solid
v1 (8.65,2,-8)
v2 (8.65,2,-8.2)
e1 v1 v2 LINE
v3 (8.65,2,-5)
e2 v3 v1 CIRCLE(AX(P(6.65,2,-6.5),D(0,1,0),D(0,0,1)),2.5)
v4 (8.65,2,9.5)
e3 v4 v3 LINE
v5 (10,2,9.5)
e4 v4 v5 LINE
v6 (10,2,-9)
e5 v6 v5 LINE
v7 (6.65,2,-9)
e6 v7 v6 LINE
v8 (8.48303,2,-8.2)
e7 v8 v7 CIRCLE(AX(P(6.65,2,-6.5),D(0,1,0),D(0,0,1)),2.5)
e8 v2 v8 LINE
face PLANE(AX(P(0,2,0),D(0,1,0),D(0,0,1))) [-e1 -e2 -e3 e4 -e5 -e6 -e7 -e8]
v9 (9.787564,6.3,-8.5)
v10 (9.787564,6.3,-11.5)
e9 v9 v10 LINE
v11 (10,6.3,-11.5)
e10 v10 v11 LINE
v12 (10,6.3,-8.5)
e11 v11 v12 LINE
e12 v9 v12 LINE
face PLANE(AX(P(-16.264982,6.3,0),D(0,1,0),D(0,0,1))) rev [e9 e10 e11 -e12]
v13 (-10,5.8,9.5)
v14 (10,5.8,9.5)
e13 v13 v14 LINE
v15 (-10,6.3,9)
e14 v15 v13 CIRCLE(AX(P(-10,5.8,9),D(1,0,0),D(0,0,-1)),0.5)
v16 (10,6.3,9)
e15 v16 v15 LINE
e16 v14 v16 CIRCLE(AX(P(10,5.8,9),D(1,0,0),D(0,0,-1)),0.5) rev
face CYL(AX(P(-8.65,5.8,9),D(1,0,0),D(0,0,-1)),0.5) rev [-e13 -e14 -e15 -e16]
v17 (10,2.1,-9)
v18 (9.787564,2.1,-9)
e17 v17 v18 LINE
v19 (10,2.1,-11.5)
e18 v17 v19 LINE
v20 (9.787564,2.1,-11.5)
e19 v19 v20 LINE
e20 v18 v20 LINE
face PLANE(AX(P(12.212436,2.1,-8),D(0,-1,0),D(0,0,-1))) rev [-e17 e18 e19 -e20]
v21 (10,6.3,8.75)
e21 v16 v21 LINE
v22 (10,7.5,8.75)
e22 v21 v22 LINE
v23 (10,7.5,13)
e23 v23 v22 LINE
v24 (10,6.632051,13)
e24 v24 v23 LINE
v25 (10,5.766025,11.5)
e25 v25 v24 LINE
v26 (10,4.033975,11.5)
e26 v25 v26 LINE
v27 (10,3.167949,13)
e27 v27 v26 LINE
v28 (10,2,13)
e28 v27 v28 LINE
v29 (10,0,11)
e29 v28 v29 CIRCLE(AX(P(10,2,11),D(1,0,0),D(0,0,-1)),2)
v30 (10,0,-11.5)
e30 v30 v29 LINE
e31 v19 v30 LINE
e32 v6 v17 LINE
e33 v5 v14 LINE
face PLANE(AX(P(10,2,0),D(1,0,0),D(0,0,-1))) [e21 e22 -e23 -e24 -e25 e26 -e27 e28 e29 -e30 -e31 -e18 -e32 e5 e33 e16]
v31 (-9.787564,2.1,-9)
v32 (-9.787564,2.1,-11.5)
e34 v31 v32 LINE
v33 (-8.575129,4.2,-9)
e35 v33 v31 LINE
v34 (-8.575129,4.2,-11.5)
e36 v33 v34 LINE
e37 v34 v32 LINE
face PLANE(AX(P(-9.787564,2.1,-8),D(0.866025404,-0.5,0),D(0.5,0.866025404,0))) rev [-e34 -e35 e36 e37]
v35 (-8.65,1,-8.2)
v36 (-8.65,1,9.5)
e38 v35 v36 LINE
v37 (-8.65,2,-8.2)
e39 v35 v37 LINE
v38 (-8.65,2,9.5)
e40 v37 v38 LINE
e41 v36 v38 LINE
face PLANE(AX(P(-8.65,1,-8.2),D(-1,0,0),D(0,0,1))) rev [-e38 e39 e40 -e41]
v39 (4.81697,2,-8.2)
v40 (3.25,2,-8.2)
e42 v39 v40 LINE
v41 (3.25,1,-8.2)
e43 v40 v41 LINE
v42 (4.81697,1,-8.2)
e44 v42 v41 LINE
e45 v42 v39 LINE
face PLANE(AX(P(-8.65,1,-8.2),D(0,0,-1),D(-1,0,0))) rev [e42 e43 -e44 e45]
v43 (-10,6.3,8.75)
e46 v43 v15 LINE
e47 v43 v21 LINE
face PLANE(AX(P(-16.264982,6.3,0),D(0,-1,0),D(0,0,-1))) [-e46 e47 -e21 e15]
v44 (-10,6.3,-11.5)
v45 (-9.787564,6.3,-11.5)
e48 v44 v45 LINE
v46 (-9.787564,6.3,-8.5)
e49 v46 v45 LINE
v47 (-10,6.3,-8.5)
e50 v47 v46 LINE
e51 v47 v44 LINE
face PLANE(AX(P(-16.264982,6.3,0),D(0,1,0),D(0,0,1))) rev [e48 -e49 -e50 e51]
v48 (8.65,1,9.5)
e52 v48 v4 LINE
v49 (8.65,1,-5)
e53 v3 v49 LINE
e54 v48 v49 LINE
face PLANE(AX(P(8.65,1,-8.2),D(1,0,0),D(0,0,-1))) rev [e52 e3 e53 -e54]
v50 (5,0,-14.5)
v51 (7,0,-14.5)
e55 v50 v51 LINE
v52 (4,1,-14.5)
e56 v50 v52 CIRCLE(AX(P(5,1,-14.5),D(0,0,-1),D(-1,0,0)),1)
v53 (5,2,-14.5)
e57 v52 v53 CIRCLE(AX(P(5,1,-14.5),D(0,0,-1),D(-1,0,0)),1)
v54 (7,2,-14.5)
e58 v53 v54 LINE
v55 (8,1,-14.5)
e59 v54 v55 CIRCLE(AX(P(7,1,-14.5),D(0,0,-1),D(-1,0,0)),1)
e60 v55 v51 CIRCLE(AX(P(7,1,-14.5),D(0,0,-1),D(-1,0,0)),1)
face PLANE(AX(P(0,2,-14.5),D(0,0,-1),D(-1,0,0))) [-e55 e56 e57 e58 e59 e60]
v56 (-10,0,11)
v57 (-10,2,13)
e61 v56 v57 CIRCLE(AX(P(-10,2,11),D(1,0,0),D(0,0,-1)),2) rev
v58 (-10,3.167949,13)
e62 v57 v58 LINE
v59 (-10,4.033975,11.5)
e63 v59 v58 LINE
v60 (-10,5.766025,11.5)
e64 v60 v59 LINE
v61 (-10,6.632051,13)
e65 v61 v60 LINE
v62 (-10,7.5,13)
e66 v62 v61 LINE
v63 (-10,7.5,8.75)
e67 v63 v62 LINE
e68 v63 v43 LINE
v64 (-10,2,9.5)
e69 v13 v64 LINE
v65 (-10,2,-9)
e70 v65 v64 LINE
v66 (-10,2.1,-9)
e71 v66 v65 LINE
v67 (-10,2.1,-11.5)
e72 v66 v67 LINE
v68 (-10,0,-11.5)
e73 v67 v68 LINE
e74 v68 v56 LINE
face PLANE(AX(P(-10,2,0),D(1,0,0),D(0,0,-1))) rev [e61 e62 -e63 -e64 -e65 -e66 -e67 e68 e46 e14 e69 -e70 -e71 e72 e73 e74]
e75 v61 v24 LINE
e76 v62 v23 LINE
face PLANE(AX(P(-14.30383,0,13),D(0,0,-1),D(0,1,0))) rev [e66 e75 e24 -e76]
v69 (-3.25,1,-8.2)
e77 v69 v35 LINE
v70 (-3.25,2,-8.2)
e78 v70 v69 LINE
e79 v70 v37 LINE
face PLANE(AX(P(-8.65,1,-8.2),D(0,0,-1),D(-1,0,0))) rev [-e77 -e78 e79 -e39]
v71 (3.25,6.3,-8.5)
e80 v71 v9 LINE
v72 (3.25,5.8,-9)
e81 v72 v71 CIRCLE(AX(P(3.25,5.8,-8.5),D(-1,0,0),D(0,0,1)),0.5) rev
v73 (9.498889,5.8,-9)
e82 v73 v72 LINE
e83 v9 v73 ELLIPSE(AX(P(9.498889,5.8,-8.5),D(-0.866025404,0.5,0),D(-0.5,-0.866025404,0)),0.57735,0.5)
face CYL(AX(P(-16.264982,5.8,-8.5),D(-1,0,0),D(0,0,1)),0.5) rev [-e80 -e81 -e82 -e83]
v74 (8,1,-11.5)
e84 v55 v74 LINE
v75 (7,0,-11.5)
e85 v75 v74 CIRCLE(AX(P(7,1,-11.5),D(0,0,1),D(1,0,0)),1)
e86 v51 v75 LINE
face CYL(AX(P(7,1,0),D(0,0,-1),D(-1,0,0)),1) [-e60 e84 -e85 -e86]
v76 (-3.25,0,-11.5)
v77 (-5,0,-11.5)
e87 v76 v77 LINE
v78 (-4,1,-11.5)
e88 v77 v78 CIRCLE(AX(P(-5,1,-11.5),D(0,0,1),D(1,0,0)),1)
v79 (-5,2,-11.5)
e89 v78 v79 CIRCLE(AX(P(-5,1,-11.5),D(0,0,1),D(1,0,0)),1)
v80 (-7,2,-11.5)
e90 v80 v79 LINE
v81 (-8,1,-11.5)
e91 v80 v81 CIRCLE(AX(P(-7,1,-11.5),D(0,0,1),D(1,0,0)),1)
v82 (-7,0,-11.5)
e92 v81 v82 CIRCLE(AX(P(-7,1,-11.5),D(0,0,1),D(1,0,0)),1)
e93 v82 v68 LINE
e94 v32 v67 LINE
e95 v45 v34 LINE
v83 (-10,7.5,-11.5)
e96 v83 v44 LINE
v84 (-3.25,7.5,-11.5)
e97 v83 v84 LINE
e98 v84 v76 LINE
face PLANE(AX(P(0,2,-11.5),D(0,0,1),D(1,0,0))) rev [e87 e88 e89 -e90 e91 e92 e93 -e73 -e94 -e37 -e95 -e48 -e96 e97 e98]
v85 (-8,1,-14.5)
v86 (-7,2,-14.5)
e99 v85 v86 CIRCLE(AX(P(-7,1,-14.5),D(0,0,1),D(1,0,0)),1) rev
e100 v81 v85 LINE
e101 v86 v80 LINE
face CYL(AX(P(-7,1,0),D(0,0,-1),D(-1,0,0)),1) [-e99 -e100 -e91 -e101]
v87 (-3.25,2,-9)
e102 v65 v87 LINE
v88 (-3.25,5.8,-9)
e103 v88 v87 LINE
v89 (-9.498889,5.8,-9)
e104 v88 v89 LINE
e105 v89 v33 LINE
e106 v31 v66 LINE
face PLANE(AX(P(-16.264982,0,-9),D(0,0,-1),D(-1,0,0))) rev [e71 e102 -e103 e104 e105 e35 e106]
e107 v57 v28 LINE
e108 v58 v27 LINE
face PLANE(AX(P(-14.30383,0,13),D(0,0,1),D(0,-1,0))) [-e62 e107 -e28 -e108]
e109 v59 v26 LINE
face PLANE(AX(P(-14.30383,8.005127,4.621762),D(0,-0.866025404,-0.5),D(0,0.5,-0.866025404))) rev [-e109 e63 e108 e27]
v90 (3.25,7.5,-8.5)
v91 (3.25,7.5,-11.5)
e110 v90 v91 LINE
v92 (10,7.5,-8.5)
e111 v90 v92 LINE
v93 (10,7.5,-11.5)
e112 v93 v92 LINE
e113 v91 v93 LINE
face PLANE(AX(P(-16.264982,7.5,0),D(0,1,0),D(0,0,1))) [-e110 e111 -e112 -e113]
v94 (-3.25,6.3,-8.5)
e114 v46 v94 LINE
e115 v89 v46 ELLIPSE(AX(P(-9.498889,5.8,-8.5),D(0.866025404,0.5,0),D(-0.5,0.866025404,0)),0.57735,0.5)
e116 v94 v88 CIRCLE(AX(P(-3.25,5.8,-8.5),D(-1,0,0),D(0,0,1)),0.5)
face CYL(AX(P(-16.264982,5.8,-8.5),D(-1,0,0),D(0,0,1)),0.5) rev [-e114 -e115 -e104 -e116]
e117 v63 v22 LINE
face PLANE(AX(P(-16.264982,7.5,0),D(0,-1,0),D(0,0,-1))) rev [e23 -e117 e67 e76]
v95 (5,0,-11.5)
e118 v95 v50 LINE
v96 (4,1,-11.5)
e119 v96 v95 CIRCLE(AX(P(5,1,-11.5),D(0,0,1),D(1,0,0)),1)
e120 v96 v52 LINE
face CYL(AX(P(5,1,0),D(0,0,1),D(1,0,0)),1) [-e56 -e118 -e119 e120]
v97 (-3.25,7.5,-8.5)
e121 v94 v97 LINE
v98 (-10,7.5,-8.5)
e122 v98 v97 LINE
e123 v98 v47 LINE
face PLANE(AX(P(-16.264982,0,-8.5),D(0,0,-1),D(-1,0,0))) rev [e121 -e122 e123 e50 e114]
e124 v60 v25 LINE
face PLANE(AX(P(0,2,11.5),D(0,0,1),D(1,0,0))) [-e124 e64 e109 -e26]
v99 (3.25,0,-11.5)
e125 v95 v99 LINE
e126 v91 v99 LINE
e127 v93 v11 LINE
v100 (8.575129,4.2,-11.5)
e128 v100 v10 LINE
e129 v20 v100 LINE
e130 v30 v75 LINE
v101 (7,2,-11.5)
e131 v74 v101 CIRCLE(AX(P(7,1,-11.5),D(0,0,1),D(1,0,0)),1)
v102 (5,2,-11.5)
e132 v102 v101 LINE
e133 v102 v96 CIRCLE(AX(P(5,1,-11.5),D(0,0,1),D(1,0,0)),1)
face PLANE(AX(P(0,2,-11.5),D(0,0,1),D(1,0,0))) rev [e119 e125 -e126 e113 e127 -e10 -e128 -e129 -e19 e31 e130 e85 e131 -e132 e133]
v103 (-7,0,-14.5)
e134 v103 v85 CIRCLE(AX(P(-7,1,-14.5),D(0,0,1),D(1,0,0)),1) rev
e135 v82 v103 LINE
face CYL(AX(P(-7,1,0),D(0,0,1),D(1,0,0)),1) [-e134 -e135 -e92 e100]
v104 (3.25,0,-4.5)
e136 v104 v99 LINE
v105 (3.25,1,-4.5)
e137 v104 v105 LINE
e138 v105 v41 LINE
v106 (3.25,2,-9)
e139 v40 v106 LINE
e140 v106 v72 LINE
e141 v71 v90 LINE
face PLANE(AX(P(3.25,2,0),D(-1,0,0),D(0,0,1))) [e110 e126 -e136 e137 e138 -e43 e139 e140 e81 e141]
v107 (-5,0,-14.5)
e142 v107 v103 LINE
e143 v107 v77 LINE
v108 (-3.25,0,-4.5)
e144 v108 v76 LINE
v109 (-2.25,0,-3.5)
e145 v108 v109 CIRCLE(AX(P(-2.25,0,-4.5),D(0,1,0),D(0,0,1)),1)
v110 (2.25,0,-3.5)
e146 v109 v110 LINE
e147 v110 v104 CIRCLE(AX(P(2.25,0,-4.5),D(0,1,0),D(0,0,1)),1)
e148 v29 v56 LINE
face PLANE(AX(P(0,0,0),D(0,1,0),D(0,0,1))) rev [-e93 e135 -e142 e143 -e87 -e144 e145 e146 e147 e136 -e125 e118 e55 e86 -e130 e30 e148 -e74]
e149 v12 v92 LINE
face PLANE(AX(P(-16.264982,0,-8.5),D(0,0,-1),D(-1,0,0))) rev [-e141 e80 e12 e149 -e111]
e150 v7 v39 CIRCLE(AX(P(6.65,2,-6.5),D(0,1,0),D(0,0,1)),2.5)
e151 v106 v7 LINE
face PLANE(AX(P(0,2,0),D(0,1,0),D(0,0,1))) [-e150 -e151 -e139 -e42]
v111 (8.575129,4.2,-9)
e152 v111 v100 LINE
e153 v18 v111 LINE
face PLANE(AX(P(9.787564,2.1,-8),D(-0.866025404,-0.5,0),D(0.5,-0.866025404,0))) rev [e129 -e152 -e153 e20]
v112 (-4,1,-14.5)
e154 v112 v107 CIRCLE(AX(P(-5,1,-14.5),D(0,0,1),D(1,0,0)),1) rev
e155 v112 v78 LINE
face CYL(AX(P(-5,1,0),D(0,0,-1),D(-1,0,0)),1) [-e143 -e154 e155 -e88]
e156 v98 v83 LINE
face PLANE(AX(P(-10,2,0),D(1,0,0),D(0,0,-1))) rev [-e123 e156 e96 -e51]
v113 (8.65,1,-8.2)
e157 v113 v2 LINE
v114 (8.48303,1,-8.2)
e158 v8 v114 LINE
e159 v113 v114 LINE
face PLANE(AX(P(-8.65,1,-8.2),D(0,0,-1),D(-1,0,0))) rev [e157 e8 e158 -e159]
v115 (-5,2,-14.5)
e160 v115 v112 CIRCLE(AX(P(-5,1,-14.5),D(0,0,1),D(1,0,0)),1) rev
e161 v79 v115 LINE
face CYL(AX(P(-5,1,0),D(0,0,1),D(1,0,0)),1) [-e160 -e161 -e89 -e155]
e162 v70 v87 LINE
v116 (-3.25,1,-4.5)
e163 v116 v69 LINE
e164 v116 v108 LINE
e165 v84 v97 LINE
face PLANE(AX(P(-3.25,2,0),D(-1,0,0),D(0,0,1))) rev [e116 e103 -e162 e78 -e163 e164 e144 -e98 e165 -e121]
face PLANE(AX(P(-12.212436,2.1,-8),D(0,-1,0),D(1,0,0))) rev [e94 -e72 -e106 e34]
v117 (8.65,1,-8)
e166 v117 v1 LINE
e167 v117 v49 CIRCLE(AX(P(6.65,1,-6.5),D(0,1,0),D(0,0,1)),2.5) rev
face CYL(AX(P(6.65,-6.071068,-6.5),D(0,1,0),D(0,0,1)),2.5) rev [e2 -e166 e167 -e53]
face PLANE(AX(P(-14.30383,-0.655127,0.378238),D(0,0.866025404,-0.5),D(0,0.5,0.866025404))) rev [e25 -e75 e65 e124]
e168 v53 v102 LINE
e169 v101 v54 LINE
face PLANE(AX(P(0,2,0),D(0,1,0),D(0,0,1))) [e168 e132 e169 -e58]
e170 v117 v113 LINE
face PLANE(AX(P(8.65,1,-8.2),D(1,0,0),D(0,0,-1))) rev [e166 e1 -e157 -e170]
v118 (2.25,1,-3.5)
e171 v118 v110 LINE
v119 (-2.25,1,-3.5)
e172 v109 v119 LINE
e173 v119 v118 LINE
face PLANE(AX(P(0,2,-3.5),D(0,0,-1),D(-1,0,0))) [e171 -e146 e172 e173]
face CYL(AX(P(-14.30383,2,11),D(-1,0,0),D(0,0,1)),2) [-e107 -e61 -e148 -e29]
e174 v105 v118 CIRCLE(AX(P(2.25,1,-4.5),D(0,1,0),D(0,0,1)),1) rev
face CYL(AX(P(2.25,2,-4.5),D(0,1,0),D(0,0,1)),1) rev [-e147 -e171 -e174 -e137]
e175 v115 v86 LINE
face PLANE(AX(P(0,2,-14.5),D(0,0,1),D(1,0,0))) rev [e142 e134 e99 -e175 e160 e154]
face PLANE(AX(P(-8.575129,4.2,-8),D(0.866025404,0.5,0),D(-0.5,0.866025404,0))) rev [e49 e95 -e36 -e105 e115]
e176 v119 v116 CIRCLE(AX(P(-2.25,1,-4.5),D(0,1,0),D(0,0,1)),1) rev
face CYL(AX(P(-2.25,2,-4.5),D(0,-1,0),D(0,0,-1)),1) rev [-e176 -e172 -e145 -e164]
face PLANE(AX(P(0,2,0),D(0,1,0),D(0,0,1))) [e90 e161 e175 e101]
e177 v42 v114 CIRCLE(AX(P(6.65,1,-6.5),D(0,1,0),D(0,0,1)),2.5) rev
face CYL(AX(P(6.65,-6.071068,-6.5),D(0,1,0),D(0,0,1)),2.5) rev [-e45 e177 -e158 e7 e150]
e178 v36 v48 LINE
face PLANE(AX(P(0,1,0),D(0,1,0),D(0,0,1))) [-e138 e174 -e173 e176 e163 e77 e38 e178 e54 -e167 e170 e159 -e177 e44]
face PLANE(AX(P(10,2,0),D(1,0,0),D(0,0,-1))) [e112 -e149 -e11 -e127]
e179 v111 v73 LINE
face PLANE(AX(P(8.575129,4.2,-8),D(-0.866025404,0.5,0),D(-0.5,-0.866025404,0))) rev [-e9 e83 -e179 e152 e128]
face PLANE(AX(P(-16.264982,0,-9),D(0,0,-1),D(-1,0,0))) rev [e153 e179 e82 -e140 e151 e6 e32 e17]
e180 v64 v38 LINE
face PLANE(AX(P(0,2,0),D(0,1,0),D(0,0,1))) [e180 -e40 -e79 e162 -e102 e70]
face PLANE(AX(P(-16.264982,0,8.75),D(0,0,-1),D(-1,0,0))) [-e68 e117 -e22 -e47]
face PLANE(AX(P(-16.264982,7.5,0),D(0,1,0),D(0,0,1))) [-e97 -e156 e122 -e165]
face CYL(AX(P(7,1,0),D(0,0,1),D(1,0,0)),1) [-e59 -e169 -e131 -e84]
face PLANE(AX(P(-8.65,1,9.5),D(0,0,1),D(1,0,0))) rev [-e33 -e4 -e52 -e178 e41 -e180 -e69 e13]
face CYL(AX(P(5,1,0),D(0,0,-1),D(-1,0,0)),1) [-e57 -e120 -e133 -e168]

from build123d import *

# Parameters (mm, degrees)
BOSS_EXTRUDE1_DEPTH = 2
FILLET1_R           = 1
SKETCH4_W           = 17.3
SKETCH4_H           = 17.7
CUT_EXTRUDE3_DEPTH  = 1
BOSS_EXTRUDE3_REACH = 26.784
CUT_EXTRUDE5_REACH  = 21.144
SKETCH7_W           = 6.5
SKETCH7_H           = 3
CUT_EXTRUDE6_DEPTH  = 3.5
FILLET3_R           = 0.5
BOSS_EXTRUDE4_DEPTH = 20
SKETCH10_R          = 2.5
CUT_EXTRUDE7_DEPTH  = 1
FILLET4_R           = 2


# Some blends are built 0.0001 mm under size
with BuildPart() as part:
    # Sketch1 → Boss-Extrude1 (new body)
    with BuildSketch(Plane(origin=(0, 0, 0), x_dir=(1, 0, 0), z_dir=(0, 1, 0))):
        Polygon((10, -11.5), (10, 11.5), (8, 11.5), (8, 14.5), (4, 14.5), (4, 11.5), (3.25, 11.5), (3.25, 3.5), (-3.25, 3.5), (-3.25, 11.5), (-4, 11.5), (-4, 14.5), (-8, 14.5), (-8, 11.5), (-10, 11.5), (-10, -11.5), align=None)
    extrude(amount=BOSS_EXTRUDE1_DEPTH)

    # Fillet1
    fillet1_edges = [part.edges().sort_by_distance(p)[0] for p in [
        (-3.25, 1, -3.5),
        (3.25, 1, -3.5),
        (-8, 0, -13),
        (-8, 2, -13),
        (4, 0, -13),
        (4, 2, -13),
        (8, 0, -13),
        (8, 2, -13),
        (-4, 0, -13),
        (-4, 2, -13),
    ]]
    fillet(fillet1_edges, radius=FILLET1_R - 0.0001)  # a hair under: the kernel refuses the full size

    # Sketch4 → Cut-Extrude3 (cut)
    with BuildSketch(Plane(origin=(0, 2, 0), x_dir=(1, 0, 0), z_dir=(0, 1, 0))):
        with Locations((0, -0.65)):
            Rectangle(SKETCH4_W, SKETCH4_H)
    extrude(amount=-CUT_EXTRUDE3_DEPTH, mode=Mode.SUBTRACT)

    # Boss-Extrude3: up to this face of the body (flat: up to its plane)
    boss_extrude3_end = Plane(part.part.faces().sort_by_distance((-10, 1, 0))[0])
    # Sketch5 → Boss-Extrude3 (add, up to the picked face)
    with BuildSketch(Plane(origin=(10, 0, 0), x_dir=(0, 0, -1), z_dir=(1, 0, 0)), mode=Mode.PRIVATE) as boss_extrude3_sk1:
        Polygon((-11.5, 2), (-9.5, 2), (-9.5, 6.3), (-8.75, 6.3), (-8.75, 7.5), (-11.5, 7.5), align=None)
    boss_extrude3_tool1 = split(extrude(boss_extrude3_sk1.sketch, amount=-BOSS_EXTRUDE3_REACH, mode=Mode.PRIVATE), bisect_by=boss_extrude3_end, keep=Keep.BOTH, mode=Mode.PRIVATE)
    # Sketch5 → Boss-Extrude3 (add, up to the picked face)
    with BuildSketch(Plane(origin=(10, 0, 0), x_dir=(0, 0, -1), z_dir=(1, 0, 0)), mode=Mode.PRIVATE) as boss_extrude3_sk2:
        Polygon((9, 2), (11.5, 2), (11.5, 7.5), (8.5, 7.5), (8.5, 6.3), (9, 6.3), align=None)
    boss_extrude3_tool2 = split(extrude(boss_extrude3_sk2.sketch, amount=-BOSS_EXTRUDE3_REACH, mode=Mode.PRIVATE), bisect_by=boss_extrude3_end, keep=Keep.BOTH, mode=Mode.PRIVATE)
    add(boss_extrude3_tool1.solids().sort_by(Axis((10, 4.912605, 10.396008), (-1, 0, 0)))[0])
    add(boss_extrude3_tool2.solids().sort_by(Axis((10, 4.839895, -10.187282), (-1, 0, 0)))[0])

    # Sketch7 → Cut-Extrude5 (cut, up to next)
    with BuildSketch(Plane(origin=(0, 7.5, 0), x_dir=(1, 0, 0), z_dir=(0, 1, 0)), mode=Mode.PRIVATE) as cut_extrude5_sk1:
        with Locations((0, 10)):
            Rectangle(SKETCH7_W, SKETCH7_H)
    cut_extrude5_tool1 = extrude(cut_extrude5_sk1.sketch, amount=-CUT_EXTRUDE5_REACH, mode=Mode.PRIVATE) & part.part
    add(cut_extrude5_tool1.solids().sort_by_distance((0, 7.5, -10))[0], mode=Mode.SUBTRACT)

    # Sketch8 → Cut-Extrude6 (cut)
    with BuildSketch(Plane(origin=(0, 0, -11.5), x_dir=(-1, 0, 0), z_dir=(0, 0, -1))):
        Polygon((-8.575128869, 4.2), (-9.787564435, 6.3), (-12.212435565, 6.3), (-13.424871131, 4.2), (-12.212435565, 2.1), (-9.787564435, 2.1), align=None)
        Polygon((12.212435565, 2.1), (9.787564435, 2.1), (8.575128869, 4.2), (9.787564435, 6.3), (12.212435565, 6.3), (13.424871131, 4.2), align=None)
    extrude(amount=-CUT_EXTRUDE6_DEPTH, mode=Mode.SUBTRACT)

    # Fillet3
    # the kernel refuses this fillet: 0.5 mm, written as the material it adds along each edge
    with BuildSketch(Plane(origin=(10, 6.3, 9.5), x_dir=(0, -1, 0), z_dir=(-1, 0, 0))) as fillet3_piece_1:
        with BuildLine():
            CenterArc((FILLET3_R, -FILLET3_R), FILLET3_R, 90, 90)
            Line((0, -FILLET3_R), (0, 0))
            Line((0, 0), (FILLET3_R, 0))
        make_face()
    extrude(amount=20)
    with BuildSketch(Plane(origin=(11.037564435, 6.3, -9), x_dir=(0, -1, 0), z_dir=(-1, 0, 0))) as fillet3_piece_2_section:
        with BuildLine():
            CenterArc((FILLET3_R, FILLET3_R), FILLET3_R, 180, 90)
            Line((0, FILLET3_R), (0, 0))
            Line((0, 0), (FILLET3_R, 0))
        make_face()
    fillet3_piece_2 = extrude(amount=7.787564435, mode=Mode.PRIVATE)
    fillet3_piece_2 = split(fillet3_piece_2, bisect_by=Plane(origin=(8.913707181, 4.786434839, -8.886190127), z_dir=(-0.8660254037844385, 0.5000000000000003, 0)), keep=Keep.TOP, mode=Mode.PRIVATE)
    add(fillet3_piece_2)
    with BuildSketch(Plane(origin=(-3.25, 6.3, -9), x_dir=(0, -1, 0), z_dir=(-1, 0, 0))) as fillet3_piece_3_section:
        with BuildLine():
            CenterArc((FILLET3_R, FILLET3_R), FILLET3_R, 180, 90)
            Line((0, FILLET3_R), (0, 0))
            Line((0, 0), (FILLET3_R, 0))
        make_face()
    fillet3_piece_3 = extrude(amount=7.787564435, mode=Mode.PRIVATE)
    fillet3_piece_3 = split(fillet3_piece_3, bisect_by=Plane(origin=(-8.913707181, 4.786434839, -8.886190127), z_dir=(0.8660254037844393, 0.49999999999999906, 0)), keep=Keep.TOP, mode=Mode.PRIVATE)
    add(fillet3_piece_3)

    # Sketch9 → Boss-Extrude4 (add)
    with BuildSketch(Plane(origin=(10, 0, 0), x_dir=(0, 0, -1), z_dir=(1, 0, 0))):
        Polygon((-13, 6.632050808), (-11.5, 5.766025404), (-11.5, 7.5), (-13, 7.5), align=None)
        Polygon((-11.5, 0), (-11.5, 4.033974596), (-13, 3.167949192), (-13, 0), align=None)
    extrude(amount=-BOSS_EXTRUDE4_DEPTH)

    # Sketch10 → Cut-Extrude7 (cut)
    with BuildSketch(Plane(origin=(0, 2, 0), x_dir=(1, 0, 0), z_dir=(0, 1, 0))):
        with Locations((6.65, 6.5)):
            Circle(SKETCH10_R)
    extrude(amount=-CUT_EXTRUDE7_DEPTH, mode=Mode.SUBTRACT)

    # Fillet4
    fillet4_edges = [part.edges().sort_by_distance(p)[0] for p in [
        (0, 0, 13),
    ]]
    fillet(fillet4_edges, radius=FILLET4_R)


solid = part.part
